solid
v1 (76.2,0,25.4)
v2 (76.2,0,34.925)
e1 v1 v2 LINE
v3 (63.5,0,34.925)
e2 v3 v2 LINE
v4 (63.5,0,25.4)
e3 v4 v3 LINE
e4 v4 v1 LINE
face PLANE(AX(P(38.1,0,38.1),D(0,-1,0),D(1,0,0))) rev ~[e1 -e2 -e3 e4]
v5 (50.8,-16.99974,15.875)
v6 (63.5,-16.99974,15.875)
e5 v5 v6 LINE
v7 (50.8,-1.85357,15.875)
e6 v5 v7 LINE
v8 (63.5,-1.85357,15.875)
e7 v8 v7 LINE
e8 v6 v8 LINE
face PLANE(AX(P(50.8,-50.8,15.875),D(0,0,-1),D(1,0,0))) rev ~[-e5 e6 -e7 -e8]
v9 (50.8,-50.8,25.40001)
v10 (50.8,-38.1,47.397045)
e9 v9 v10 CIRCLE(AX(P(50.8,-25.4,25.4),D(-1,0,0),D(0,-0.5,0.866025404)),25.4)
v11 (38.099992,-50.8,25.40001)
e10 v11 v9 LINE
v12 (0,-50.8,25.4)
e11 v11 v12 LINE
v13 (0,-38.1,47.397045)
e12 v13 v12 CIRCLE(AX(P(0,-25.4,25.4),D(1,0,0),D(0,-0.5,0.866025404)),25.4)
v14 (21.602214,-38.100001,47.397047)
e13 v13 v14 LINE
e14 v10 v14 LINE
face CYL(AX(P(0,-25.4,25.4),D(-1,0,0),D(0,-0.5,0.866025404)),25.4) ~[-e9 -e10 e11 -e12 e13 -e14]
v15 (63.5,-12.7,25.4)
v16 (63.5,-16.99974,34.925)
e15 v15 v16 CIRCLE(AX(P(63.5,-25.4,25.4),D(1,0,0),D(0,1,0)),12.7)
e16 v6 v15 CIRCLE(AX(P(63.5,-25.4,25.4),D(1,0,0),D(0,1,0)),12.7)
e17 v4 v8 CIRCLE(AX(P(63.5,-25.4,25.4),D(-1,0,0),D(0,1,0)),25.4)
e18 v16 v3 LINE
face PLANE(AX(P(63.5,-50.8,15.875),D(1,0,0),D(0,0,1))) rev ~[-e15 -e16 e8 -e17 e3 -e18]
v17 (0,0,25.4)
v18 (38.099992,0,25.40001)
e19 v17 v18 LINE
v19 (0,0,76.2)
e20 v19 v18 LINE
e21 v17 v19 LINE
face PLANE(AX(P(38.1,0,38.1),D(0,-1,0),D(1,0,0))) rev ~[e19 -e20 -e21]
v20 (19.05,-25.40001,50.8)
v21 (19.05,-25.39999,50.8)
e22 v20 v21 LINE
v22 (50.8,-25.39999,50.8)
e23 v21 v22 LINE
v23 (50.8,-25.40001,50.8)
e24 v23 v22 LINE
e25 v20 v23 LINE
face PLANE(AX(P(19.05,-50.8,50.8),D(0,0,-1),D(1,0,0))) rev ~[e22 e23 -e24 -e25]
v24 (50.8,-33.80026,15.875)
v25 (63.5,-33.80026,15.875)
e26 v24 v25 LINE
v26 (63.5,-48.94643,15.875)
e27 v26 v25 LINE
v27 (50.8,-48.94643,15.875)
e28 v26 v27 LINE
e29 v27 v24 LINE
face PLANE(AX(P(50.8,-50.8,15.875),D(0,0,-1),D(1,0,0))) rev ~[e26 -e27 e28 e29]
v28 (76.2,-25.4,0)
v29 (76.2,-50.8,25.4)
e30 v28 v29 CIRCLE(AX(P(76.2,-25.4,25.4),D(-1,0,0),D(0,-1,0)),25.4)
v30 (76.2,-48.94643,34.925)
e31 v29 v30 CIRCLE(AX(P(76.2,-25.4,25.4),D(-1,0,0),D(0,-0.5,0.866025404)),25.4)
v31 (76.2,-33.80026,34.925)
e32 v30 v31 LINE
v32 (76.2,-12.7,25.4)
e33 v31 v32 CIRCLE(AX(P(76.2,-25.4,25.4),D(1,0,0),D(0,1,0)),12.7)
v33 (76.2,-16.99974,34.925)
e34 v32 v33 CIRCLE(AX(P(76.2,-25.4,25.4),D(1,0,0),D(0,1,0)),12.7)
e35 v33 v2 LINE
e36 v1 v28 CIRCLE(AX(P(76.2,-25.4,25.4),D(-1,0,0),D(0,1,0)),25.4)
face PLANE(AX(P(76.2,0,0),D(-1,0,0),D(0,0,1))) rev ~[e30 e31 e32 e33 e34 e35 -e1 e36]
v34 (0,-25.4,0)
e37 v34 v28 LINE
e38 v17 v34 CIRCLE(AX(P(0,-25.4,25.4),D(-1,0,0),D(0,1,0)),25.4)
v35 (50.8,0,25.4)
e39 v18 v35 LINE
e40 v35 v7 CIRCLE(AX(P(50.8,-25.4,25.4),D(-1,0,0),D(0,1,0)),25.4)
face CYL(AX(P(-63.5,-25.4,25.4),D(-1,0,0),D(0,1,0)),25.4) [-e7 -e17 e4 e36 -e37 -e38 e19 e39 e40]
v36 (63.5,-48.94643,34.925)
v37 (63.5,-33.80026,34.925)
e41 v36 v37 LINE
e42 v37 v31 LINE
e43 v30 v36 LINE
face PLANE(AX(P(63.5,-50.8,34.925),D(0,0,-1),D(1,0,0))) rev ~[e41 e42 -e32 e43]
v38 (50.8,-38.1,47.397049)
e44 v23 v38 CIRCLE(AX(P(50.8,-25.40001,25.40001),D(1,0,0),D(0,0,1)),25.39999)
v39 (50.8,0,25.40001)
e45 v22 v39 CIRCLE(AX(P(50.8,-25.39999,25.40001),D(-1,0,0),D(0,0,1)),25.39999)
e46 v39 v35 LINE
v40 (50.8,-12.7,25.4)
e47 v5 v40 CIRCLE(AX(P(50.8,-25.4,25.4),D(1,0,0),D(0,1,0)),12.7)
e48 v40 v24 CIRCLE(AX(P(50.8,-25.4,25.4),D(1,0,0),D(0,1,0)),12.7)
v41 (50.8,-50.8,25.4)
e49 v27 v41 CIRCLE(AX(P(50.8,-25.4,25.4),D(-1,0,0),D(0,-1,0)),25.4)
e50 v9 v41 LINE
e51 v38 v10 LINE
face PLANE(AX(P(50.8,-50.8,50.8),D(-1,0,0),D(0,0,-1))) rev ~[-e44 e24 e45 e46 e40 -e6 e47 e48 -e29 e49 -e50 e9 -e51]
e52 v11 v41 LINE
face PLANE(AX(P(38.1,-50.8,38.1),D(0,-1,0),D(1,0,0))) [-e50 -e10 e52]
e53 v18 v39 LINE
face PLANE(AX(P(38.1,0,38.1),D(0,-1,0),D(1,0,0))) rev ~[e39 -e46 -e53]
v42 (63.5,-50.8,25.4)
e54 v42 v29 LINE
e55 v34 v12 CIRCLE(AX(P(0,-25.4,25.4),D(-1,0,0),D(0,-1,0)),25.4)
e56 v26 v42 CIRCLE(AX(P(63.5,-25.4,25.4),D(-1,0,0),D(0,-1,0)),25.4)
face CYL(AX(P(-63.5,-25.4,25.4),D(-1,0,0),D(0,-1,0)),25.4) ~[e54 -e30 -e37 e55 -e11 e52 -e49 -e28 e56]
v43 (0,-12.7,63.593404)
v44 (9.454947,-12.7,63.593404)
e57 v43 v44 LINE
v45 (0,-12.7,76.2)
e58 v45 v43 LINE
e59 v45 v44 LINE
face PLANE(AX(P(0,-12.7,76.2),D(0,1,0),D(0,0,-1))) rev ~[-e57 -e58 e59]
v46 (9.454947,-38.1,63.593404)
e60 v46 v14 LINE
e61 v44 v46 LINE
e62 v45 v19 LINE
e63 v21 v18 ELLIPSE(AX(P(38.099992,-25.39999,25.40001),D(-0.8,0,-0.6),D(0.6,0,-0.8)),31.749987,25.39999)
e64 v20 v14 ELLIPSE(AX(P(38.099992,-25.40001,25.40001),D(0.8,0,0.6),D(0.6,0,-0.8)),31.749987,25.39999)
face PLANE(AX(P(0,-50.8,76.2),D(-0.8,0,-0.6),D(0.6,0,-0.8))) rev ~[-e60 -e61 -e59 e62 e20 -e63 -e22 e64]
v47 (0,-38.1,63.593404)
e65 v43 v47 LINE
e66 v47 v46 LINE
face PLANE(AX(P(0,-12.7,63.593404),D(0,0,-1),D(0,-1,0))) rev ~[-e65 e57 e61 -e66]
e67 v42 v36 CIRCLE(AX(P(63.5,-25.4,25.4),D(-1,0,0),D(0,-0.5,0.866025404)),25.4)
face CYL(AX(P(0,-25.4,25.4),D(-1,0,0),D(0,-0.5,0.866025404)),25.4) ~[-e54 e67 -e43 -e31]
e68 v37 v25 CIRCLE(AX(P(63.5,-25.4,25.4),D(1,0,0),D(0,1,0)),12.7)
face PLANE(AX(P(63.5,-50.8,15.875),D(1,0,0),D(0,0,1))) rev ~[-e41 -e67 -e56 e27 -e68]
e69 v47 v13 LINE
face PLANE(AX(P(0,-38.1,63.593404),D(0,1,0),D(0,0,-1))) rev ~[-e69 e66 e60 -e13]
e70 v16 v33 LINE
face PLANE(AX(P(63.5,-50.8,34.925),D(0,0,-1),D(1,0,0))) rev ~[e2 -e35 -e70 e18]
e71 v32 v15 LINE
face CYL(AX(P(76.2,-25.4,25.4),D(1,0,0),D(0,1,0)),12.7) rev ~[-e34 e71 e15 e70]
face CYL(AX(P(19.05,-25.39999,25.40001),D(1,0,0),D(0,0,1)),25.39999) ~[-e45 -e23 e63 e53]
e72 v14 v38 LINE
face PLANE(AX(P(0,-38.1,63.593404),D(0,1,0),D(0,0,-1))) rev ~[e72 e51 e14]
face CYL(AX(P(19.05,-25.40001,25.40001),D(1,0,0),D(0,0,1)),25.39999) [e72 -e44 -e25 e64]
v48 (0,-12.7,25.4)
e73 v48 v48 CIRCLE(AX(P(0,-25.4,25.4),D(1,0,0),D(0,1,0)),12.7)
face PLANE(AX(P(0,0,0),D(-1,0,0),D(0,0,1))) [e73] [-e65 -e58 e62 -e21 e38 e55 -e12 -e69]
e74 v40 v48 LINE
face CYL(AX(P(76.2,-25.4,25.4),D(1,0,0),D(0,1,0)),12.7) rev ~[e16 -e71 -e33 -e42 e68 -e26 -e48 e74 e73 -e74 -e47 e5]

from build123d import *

# Parameters (mm, degrees)
F0_W         = 76.2
F0_H         = 76.2
F1_DEPTH     = 50.8
F2_R         = 12.7
F3_DEPTH     = 76.201
F5_DEPTH     = 25.4
F6_DEPTH     = 50.801
F7_R         = 25.39999
F9_DEPTH     = 25.4
F10_DEPTH    = 76.201
F11_T1_DEPTH = 203.2


# Not quite as in the source:
# - a fillet or chamfer that OpenCascade refuses, or shapes differently, is made with other operations: its cross-section is extruded or revolved along the edge and cut away or added
# - a fillet or chamfer is up to 0.001 mm smaller than in the source, because OpenCascade refuses the exact size


with BuildPart() as f1:
    # F0 (on Front) → F1 (new body)
    with BuildSketch(Plane.XZ):
        with Locations((38.1, 38.1)):
            Rectangle(F0_W, F0_H)
    extrude(amount=F1_DEPTH)

    # F2 (on face) → F3 (cut, through all)
    with BuildSketch(Plane.YZ.offset(76.2)):
        with Locations((-25.4, 25.4)):
            Circle(F2_R)
    extrude(amount=-F3_DEPTH, mode=Mode.SUBTRACT)

    # F4 (on face) → F5 (cut)
    with BuildSketch(Plane.XZ.offset(50.8)):
        Polygon((63.5, 34.925), (76.2, 34.925), (76.2, 76.2), (0, 76.2), (19.05, 50.8), (50.8, 50.8), (50.8, 15.875), (63.5, 15.875), align=None)
    extrude(amount=-F5_DEPTH, mode=Mode.SUBTRACT)

    # F4 (on face) → F6 (cut, through all)
    with BuildSketch(Plane.XZ.offset(50.8)):
        Polygon((63.5, 34.925), (76.2, 34.925), (76.2, 76.2), (0, 76.2), (19.05, 50.8), (50.8, 50.8), (50.8, 15.875), (63.5, 15.875), align=None)
    extrude(amount=-F6_DEPTH, mode=Mode.SUBTRACT)

    # F7 (radius 25.4 in the source; OpenCascade refuses exactly that, so slightly less here)
    f7_edges = [f1.edges().sort_by_distance(p)[0] for p in [
        (34.925, -50.8, 50.8),
        (34.925, 0, 50.8),
    ]]
    fillet(f7_edges, radius=F7_R)

    # F8 (on face) → F9 (cut)
    with BuildSketch(Plane(origin=(0, 0, 0), x_dir=(0, -1, 0), z_dir=(-1, 0, 0))):
        with BuildLine():
            Line((50.8, 76.2), (12.7, 76.2))
            Line((12.7, 76.2), (12.7, 63.5934035911))
            Line((12.7, 63.5934035911), (38.1, 63.5934035911))
            Line((38.1, 63.5934035911), (38.1, 47.3970452561))
            ThreePointArc((38.1, 47.3970452561), (47.3970452561, 38.1), (50.8, 25.4))
            Line((50.8, 25.4), (50.8, 76.2))
        make_face()
    extrude(amount=-F9_DEPTH, mode=Mode.SUBTRACT)

    # F8 (on face) → F10 (cut, through all)
    with BuildSketch(Plane(origin=(0, 0, 0), x_dir=(0, -1, 0), z_dir=(-1, 0, 0))):
        with BuildLine():
            Line((50.8, 76.2), (12.7, 76.2))
            Line((12.7, 76.2), (12.7, 63.5934035911))
            Line((12.7, 63.5934035911), (38.1, 63.5934035911))
            Line((38.1, 63.5934035911), (38.1, 47.3970452561))
            ThreePointArc((38.1, 47.3970452561), (47.3970452561, 38.1), (50.8, 25.4))
            Line((50.8, 25.4), (50.8, 76.2))
        make_face()
    extrude(amount=-F10_DEPTH, mode=Mode.SUBTRACT)

    # F11: fillet of radius 25.4 on 2 edges, made by hand

    # F11_s2 → F11_t1 (cut)
    with BuildSketch(Plane.YZ.offset(-63.5)):
        with BuildLine():
            ThreePointArc((-50.8, 25.4), (-43.3605122421, 7.4394877579), (-25.4, 0))
            Line((-25.4, 0), (-50.8, 0))
            Line((-50.8, 0), (-50.8, 25.4))
        make_face()
        with BuildLine():
            ThreePointArc((0, 25.4), (-7.4394877579, 7.4394877579), (-25.4, 0))
            Line((-25.4, 0), (0, 0))
            Line((0, 0), (0, 25.4))
        make_face()
    extrude(amount=F11_T1_DEPTH, mode=Mode.SUBTRACT)


solid = f1.part
